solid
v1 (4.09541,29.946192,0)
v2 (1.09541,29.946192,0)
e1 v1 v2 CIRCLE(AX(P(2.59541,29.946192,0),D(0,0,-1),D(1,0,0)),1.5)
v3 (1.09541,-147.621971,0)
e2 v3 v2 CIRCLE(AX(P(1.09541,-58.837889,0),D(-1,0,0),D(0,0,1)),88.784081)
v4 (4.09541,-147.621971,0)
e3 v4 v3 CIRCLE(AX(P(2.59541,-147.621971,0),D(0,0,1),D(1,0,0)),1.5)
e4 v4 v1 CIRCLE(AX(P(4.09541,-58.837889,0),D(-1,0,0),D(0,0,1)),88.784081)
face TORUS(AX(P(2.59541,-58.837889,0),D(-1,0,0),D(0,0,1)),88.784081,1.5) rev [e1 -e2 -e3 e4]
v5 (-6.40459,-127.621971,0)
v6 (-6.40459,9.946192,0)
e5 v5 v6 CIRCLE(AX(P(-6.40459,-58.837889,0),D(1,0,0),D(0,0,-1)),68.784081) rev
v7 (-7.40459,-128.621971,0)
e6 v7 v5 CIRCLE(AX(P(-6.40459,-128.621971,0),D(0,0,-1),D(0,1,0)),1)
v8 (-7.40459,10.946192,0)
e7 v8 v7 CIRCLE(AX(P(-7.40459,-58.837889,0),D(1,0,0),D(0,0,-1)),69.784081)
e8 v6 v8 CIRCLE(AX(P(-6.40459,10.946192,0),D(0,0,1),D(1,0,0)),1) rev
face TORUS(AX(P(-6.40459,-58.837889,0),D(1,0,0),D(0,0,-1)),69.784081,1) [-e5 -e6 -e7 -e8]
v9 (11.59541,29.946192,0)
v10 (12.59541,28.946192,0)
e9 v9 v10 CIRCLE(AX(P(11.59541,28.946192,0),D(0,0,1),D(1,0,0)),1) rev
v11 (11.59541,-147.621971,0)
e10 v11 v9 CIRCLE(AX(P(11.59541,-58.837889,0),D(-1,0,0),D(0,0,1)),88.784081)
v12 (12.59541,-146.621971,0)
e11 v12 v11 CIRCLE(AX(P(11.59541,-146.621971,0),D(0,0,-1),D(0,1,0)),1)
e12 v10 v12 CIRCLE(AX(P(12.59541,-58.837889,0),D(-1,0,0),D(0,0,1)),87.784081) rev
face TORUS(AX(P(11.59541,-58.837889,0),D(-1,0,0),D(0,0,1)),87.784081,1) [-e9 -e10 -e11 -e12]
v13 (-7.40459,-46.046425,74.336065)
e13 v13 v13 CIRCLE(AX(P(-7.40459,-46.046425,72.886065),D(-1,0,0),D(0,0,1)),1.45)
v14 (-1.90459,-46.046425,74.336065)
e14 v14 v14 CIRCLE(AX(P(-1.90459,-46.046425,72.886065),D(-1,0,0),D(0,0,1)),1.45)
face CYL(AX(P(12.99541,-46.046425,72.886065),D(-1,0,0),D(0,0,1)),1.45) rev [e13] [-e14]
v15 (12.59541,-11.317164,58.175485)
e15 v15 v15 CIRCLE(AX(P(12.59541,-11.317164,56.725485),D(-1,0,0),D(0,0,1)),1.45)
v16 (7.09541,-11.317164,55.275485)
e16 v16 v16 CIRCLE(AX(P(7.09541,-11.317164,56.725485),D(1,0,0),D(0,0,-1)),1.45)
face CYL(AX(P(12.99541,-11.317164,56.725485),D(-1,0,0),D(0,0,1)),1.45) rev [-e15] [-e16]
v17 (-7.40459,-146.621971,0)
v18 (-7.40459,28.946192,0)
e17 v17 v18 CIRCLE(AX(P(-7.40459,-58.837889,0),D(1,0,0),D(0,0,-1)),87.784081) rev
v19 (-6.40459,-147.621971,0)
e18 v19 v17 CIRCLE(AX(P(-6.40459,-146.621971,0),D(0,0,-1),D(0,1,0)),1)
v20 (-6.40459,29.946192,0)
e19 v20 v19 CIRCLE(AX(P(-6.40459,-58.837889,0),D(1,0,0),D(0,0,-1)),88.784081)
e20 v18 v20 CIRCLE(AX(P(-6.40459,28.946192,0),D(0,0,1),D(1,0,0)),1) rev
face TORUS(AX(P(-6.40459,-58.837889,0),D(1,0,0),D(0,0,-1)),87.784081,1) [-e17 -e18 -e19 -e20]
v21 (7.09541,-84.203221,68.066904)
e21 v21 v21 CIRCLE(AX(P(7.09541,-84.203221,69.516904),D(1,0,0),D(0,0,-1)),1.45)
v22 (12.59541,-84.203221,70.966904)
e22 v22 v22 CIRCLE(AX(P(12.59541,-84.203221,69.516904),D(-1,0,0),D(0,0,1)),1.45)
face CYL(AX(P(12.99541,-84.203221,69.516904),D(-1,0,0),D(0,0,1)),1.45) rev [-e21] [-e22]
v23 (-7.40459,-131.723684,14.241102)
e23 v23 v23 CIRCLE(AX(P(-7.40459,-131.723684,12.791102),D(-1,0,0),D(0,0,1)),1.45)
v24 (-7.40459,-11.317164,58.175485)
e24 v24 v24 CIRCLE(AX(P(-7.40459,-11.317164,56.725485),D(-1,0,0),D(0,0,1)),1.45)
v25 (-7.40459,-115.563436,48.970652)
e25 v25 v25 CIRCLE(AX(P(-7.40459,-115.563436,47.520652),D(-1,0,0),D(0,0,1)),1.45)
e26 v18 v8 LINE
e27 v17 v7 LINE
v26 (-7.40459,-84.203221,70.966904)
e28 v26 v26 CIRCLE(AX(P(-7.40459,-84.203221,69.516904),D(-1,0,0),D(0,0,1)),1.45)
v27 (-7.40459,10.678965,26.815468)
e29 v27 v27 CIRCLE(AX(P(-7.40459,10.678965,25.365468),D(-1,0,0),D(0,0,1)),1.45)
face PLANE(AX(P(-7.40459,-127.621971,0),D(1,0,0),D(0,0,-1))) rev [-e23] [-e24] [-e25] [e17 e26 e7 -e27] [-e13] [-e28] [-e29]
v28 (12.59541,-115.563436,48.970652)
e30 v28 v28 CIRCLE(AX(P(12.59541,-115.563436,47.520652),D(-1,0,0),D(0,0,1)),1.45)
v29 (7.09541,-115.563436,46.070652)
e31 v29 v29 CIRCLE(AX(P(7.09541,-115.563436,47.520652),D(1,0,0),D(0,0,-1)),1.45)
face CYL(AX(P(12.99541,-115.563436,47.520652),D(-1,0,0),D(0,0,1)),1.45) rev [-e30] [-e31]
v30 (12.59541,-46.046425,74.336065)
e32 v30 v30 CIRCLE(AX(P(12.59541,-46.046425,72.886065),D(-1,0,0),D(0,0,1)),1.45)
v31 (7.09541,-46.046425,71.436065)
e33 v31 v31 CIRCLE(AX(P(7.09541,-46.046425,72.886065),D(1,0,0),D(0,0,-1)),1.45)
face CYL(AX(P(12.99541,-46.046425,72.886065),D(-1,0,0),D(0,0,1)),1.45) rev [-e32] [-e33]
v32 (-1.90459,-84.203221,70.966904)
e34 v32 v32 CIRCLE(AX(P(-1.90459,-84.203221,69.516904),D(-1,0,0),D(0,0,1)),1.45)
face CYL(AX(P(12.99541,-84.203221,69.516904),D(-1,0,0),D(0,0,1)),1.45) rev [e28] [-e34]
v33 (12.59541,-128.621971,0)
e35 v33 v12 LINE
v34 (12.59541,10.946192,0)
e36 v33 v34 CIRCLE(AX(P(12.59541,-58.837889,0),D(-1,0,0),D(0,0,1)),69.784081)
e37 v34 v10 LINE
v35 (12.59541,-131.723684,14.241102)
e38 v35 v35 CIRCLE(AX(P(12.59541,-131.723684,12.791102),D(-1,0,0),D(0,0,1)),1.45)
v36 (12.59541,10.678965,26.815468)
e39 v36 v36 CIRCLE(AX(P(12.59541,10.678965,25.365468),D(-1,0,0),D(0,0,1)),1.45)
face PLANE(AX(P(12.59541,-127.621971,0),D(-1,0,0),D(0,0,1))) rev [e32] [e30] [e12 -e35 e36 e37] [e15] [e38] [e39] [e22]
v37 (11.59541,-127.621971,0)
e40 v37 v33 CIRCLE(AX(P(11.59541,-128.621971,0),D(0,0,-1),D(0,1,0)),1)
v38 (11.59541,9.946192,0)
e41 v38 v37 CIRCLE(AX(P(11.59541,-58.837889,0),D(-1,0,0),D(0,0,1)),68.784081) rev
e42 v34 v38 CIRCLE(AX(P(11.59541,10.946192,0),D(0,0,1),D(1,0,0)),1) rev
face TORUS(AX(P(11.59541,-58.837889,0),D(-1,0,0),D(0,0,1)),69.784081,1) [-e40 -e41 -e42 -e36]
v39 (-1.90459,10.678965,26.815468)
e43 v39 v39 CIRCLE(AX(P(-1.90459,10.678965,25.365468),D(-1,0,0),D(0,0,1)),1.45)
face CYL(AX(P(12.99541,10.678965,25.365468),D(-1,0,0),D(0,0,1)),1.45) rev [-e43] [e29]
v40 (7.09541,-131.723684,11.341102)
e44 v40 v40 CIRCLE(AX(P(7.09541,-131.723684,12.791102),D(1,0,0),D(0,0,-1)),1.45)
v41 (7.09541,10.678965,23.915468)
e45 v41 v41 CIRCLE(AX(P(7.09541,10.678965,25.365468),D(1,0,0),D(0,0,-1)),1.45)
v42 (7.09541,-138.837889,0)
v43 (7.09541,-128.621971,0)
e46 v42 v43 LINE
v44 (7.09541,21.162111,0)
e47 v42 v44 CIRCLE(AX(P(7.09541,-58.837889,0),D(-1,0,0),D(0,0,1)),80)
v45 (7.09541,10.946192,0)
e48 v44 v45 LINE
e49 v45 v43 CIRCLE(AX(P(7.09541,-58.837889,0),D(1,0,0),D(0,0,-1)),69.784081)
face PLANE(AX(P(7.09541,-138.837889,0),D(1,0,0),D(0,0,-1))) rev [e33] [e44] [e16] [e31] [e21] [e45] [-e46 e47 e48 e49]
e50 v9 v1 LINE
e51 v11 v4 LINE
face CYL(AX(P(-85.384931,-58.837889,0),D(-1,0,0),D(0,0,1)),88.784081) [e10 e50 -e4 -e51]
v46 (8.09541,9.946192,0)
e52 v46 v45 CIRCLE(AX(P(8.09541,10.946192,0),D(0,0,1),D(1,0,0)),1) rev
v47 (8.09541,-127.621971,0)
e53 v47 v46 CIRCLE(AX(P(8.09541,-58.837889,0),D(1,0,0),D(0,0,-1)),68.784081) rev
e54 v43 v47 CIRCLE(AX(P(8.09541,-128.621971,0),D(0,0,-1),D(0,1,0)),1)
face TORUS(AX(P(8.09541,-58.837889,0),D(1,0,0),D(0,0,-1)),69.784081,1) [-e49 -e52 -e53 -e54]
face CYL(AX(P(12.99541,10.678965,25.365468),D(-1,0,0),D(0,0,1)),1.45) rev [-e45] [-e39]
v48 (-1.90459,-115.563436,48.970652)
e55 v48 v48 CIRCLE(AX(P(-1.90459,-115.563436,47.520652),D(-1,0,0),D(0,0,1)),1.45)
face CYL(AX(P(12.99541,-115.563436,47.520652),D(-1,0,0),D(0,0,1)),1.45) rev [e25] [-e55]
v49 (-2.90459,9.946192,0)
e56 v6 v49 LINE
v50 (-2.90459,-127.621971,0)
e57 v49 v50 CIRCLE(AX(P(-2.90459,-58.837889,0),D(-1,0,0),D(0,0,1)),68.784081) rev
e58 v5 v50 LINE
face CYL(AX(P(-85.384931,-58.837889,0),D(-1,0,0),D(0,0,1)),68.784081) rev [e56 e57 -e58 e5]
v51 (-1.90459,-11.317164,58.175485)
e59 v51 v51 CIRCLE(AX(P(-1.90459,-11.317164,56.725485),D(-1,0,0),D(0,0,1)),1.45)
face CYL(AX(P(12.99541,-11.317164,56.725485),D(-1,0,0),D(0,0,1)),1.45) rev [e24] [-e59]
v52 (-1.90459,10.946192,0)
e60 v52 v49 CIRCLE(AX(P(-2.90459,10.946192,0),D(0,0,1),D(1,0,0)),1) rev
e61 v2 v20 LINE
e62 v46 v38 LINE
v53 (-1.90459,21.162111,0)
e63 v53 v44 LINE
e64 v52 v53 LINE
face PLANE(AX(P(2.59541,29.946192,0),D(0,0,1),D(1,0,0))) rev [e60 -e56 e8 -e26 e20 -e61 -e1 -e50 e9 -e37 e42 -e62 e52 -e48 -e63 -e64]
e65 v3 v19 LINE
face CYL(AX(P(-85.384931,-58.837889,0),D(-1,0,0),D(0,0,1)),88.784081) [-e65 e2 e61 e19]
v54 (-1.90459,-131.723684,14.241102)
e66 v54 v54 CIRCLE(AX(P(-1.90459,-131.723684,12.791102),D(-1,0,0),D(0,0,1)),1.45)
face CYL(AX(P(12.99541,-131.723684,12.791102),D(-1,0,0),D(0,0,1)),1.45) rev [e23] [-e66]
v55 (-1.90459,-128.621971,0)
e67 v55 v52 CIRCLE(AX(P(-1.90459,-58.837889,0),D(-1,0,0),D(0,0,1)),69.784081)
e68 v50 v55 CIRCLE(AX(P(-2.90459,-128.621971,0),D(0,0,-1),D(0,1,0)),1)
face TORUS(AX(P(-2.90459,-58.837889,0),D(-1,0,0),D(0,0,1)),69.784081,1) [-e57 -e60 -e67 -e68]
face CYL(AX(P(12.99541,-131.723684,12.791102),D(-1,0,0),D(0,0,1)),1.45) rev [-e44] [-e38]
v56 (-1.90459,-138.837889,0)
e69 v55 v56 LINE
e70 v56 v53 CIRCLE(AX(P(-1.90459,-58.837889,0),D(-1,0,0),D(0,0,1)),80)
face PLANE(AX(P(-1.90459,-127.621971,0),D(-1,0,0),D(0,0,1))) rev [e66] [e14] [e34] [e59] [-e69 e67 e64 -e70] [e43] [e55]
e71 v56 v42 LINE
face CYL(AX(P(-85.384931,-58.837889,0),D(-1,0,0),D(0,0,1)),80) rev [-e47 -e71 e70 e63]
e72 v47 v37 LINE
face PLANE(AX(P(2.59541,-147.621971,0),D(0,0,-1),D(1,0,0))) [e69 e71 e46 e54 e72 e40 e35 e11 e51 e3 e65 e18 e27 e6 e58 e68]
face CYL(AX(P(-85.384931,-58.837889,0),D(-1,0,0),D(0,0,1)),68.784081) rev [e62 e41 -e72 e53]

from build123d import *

# Parameters (mm, degrees)
REVOLVE1_ANGLE          = 180
BOSS_EXTRUDE5_START     = -20
BOSS_EXTRUDE5_OUTLINE_R = 1.45
BOSS_EXTRUDE5_DEPTH     = 20
FILLET1_R               = 1
FILLET2_R               = 1
FILLET3_R               = 1


# Read off the part's stored shape, not the designer's step: Boss-Extrude5
with BuildPart() as part:
    # Sketch1 → Revolve1 (revolve)
    with BuildSketch(Plane.XY):
        with BuildLine():
            Line((-7.404589955, 9.946191987), (-7.404589955, 29.946191987))
            Line((-7.404589955, 29.946191987), (1.095410045, 29.946191987))
            ThreePointArc((1.095410045, 29.946191987), (2.595410045, 28.446191987), (4.095410045, 29.946191987))
            Line((4.095410045, 29.946191987), (12.595410045, 29.946191987))
            Line((12.595410045, 29.946191987), (12.595410045, 9.946191987))
            Line((12.595410045, 9.946191987), (7.095410045, 9.946191987))
            Line((7.095410045, 9.946191987), (7.095410045, 21.162110611))
            Line((7.095410045, 21.162110611), (-1.904589955, 21.162110611))
            Line((-1.904589955, 21.162110611), (-1.904589955, 9.946191987))
            Line((-1.904589955, 9.946191987), (-7.404589955, 9.946191987))
        make_face()
    revolve(axis=Axis((-85.384931054, -58.837889389, 0), (1, 0, 0)), revolution_arc=REVOLVE1_ANGLE)

    # Boss-Extrude5 outline → Boss-Extrude5 (cut)
    with BuildSketch(Plane.ZY.offset(7.404589955).offset(BOSS_EXTRUDE5_START)):
        with Locations((25.365468004, 10.67896492)):
            Circle(BOSS_EXTRUDE5_OUTLINE_R)
        with Locations((47.520651548, -115.563436336)):
            Circle(BOSS_EXTRUDE5_OUTLINE_R)
        with Locations((72.886064731, -46.046424732)):
            Circle(BOSS_EXTRUDE5_OUTLINE_R)
        with Locations((56.725485337, -11.317164297)):
            Circle(BOSS_EXTRUDE5_OUTLINE_R)
        with Locations((69.516903931, -84.203221399)):
            Circle(BOSS_EXTRUDE5_OUTLINE_R)
        with Locations((12.791101566, -131.723684009)):
            Circle(BOSS_EXTRUDE5_OUTLINE_R)
    extrude(amount=BOSS_EXTRUDE5_DEPTH, mode=Mode.SUBTRACT)

    # Fillet1
    fillet1_edges = [part.edges().sort_by_distance(p)[0] for p in [
        (12.595410045, -58.837889389, 88.784081376),
    ]]
    fillet(fillet1_edges, radius=FILLET1_R)

    # Fillet2
    fillet2_edges = [part.edges().sort_by_distance(p)[0] for p in [
        (-7.404589955, -58.837889389, 88.784081376),
    ]]
    fillet(fillet2_edges, radius=FILLET2_R)

    # Fillet3
    fillet3_edges = [part.edges().sort_by_distance(p)[0] for p in [
        (-7.404589955, -58.837889389, 68.784081376),
        (12.595410045, -58.837889389, 68.784081376),
        (7.095410045, -58.837889389, 68.784081376),
        (-1.904589955, -58.837889389, 68.784081376),
    ]]
    fillet(fillet3_edges, radius=FILLET3_R)


solid = part.part
